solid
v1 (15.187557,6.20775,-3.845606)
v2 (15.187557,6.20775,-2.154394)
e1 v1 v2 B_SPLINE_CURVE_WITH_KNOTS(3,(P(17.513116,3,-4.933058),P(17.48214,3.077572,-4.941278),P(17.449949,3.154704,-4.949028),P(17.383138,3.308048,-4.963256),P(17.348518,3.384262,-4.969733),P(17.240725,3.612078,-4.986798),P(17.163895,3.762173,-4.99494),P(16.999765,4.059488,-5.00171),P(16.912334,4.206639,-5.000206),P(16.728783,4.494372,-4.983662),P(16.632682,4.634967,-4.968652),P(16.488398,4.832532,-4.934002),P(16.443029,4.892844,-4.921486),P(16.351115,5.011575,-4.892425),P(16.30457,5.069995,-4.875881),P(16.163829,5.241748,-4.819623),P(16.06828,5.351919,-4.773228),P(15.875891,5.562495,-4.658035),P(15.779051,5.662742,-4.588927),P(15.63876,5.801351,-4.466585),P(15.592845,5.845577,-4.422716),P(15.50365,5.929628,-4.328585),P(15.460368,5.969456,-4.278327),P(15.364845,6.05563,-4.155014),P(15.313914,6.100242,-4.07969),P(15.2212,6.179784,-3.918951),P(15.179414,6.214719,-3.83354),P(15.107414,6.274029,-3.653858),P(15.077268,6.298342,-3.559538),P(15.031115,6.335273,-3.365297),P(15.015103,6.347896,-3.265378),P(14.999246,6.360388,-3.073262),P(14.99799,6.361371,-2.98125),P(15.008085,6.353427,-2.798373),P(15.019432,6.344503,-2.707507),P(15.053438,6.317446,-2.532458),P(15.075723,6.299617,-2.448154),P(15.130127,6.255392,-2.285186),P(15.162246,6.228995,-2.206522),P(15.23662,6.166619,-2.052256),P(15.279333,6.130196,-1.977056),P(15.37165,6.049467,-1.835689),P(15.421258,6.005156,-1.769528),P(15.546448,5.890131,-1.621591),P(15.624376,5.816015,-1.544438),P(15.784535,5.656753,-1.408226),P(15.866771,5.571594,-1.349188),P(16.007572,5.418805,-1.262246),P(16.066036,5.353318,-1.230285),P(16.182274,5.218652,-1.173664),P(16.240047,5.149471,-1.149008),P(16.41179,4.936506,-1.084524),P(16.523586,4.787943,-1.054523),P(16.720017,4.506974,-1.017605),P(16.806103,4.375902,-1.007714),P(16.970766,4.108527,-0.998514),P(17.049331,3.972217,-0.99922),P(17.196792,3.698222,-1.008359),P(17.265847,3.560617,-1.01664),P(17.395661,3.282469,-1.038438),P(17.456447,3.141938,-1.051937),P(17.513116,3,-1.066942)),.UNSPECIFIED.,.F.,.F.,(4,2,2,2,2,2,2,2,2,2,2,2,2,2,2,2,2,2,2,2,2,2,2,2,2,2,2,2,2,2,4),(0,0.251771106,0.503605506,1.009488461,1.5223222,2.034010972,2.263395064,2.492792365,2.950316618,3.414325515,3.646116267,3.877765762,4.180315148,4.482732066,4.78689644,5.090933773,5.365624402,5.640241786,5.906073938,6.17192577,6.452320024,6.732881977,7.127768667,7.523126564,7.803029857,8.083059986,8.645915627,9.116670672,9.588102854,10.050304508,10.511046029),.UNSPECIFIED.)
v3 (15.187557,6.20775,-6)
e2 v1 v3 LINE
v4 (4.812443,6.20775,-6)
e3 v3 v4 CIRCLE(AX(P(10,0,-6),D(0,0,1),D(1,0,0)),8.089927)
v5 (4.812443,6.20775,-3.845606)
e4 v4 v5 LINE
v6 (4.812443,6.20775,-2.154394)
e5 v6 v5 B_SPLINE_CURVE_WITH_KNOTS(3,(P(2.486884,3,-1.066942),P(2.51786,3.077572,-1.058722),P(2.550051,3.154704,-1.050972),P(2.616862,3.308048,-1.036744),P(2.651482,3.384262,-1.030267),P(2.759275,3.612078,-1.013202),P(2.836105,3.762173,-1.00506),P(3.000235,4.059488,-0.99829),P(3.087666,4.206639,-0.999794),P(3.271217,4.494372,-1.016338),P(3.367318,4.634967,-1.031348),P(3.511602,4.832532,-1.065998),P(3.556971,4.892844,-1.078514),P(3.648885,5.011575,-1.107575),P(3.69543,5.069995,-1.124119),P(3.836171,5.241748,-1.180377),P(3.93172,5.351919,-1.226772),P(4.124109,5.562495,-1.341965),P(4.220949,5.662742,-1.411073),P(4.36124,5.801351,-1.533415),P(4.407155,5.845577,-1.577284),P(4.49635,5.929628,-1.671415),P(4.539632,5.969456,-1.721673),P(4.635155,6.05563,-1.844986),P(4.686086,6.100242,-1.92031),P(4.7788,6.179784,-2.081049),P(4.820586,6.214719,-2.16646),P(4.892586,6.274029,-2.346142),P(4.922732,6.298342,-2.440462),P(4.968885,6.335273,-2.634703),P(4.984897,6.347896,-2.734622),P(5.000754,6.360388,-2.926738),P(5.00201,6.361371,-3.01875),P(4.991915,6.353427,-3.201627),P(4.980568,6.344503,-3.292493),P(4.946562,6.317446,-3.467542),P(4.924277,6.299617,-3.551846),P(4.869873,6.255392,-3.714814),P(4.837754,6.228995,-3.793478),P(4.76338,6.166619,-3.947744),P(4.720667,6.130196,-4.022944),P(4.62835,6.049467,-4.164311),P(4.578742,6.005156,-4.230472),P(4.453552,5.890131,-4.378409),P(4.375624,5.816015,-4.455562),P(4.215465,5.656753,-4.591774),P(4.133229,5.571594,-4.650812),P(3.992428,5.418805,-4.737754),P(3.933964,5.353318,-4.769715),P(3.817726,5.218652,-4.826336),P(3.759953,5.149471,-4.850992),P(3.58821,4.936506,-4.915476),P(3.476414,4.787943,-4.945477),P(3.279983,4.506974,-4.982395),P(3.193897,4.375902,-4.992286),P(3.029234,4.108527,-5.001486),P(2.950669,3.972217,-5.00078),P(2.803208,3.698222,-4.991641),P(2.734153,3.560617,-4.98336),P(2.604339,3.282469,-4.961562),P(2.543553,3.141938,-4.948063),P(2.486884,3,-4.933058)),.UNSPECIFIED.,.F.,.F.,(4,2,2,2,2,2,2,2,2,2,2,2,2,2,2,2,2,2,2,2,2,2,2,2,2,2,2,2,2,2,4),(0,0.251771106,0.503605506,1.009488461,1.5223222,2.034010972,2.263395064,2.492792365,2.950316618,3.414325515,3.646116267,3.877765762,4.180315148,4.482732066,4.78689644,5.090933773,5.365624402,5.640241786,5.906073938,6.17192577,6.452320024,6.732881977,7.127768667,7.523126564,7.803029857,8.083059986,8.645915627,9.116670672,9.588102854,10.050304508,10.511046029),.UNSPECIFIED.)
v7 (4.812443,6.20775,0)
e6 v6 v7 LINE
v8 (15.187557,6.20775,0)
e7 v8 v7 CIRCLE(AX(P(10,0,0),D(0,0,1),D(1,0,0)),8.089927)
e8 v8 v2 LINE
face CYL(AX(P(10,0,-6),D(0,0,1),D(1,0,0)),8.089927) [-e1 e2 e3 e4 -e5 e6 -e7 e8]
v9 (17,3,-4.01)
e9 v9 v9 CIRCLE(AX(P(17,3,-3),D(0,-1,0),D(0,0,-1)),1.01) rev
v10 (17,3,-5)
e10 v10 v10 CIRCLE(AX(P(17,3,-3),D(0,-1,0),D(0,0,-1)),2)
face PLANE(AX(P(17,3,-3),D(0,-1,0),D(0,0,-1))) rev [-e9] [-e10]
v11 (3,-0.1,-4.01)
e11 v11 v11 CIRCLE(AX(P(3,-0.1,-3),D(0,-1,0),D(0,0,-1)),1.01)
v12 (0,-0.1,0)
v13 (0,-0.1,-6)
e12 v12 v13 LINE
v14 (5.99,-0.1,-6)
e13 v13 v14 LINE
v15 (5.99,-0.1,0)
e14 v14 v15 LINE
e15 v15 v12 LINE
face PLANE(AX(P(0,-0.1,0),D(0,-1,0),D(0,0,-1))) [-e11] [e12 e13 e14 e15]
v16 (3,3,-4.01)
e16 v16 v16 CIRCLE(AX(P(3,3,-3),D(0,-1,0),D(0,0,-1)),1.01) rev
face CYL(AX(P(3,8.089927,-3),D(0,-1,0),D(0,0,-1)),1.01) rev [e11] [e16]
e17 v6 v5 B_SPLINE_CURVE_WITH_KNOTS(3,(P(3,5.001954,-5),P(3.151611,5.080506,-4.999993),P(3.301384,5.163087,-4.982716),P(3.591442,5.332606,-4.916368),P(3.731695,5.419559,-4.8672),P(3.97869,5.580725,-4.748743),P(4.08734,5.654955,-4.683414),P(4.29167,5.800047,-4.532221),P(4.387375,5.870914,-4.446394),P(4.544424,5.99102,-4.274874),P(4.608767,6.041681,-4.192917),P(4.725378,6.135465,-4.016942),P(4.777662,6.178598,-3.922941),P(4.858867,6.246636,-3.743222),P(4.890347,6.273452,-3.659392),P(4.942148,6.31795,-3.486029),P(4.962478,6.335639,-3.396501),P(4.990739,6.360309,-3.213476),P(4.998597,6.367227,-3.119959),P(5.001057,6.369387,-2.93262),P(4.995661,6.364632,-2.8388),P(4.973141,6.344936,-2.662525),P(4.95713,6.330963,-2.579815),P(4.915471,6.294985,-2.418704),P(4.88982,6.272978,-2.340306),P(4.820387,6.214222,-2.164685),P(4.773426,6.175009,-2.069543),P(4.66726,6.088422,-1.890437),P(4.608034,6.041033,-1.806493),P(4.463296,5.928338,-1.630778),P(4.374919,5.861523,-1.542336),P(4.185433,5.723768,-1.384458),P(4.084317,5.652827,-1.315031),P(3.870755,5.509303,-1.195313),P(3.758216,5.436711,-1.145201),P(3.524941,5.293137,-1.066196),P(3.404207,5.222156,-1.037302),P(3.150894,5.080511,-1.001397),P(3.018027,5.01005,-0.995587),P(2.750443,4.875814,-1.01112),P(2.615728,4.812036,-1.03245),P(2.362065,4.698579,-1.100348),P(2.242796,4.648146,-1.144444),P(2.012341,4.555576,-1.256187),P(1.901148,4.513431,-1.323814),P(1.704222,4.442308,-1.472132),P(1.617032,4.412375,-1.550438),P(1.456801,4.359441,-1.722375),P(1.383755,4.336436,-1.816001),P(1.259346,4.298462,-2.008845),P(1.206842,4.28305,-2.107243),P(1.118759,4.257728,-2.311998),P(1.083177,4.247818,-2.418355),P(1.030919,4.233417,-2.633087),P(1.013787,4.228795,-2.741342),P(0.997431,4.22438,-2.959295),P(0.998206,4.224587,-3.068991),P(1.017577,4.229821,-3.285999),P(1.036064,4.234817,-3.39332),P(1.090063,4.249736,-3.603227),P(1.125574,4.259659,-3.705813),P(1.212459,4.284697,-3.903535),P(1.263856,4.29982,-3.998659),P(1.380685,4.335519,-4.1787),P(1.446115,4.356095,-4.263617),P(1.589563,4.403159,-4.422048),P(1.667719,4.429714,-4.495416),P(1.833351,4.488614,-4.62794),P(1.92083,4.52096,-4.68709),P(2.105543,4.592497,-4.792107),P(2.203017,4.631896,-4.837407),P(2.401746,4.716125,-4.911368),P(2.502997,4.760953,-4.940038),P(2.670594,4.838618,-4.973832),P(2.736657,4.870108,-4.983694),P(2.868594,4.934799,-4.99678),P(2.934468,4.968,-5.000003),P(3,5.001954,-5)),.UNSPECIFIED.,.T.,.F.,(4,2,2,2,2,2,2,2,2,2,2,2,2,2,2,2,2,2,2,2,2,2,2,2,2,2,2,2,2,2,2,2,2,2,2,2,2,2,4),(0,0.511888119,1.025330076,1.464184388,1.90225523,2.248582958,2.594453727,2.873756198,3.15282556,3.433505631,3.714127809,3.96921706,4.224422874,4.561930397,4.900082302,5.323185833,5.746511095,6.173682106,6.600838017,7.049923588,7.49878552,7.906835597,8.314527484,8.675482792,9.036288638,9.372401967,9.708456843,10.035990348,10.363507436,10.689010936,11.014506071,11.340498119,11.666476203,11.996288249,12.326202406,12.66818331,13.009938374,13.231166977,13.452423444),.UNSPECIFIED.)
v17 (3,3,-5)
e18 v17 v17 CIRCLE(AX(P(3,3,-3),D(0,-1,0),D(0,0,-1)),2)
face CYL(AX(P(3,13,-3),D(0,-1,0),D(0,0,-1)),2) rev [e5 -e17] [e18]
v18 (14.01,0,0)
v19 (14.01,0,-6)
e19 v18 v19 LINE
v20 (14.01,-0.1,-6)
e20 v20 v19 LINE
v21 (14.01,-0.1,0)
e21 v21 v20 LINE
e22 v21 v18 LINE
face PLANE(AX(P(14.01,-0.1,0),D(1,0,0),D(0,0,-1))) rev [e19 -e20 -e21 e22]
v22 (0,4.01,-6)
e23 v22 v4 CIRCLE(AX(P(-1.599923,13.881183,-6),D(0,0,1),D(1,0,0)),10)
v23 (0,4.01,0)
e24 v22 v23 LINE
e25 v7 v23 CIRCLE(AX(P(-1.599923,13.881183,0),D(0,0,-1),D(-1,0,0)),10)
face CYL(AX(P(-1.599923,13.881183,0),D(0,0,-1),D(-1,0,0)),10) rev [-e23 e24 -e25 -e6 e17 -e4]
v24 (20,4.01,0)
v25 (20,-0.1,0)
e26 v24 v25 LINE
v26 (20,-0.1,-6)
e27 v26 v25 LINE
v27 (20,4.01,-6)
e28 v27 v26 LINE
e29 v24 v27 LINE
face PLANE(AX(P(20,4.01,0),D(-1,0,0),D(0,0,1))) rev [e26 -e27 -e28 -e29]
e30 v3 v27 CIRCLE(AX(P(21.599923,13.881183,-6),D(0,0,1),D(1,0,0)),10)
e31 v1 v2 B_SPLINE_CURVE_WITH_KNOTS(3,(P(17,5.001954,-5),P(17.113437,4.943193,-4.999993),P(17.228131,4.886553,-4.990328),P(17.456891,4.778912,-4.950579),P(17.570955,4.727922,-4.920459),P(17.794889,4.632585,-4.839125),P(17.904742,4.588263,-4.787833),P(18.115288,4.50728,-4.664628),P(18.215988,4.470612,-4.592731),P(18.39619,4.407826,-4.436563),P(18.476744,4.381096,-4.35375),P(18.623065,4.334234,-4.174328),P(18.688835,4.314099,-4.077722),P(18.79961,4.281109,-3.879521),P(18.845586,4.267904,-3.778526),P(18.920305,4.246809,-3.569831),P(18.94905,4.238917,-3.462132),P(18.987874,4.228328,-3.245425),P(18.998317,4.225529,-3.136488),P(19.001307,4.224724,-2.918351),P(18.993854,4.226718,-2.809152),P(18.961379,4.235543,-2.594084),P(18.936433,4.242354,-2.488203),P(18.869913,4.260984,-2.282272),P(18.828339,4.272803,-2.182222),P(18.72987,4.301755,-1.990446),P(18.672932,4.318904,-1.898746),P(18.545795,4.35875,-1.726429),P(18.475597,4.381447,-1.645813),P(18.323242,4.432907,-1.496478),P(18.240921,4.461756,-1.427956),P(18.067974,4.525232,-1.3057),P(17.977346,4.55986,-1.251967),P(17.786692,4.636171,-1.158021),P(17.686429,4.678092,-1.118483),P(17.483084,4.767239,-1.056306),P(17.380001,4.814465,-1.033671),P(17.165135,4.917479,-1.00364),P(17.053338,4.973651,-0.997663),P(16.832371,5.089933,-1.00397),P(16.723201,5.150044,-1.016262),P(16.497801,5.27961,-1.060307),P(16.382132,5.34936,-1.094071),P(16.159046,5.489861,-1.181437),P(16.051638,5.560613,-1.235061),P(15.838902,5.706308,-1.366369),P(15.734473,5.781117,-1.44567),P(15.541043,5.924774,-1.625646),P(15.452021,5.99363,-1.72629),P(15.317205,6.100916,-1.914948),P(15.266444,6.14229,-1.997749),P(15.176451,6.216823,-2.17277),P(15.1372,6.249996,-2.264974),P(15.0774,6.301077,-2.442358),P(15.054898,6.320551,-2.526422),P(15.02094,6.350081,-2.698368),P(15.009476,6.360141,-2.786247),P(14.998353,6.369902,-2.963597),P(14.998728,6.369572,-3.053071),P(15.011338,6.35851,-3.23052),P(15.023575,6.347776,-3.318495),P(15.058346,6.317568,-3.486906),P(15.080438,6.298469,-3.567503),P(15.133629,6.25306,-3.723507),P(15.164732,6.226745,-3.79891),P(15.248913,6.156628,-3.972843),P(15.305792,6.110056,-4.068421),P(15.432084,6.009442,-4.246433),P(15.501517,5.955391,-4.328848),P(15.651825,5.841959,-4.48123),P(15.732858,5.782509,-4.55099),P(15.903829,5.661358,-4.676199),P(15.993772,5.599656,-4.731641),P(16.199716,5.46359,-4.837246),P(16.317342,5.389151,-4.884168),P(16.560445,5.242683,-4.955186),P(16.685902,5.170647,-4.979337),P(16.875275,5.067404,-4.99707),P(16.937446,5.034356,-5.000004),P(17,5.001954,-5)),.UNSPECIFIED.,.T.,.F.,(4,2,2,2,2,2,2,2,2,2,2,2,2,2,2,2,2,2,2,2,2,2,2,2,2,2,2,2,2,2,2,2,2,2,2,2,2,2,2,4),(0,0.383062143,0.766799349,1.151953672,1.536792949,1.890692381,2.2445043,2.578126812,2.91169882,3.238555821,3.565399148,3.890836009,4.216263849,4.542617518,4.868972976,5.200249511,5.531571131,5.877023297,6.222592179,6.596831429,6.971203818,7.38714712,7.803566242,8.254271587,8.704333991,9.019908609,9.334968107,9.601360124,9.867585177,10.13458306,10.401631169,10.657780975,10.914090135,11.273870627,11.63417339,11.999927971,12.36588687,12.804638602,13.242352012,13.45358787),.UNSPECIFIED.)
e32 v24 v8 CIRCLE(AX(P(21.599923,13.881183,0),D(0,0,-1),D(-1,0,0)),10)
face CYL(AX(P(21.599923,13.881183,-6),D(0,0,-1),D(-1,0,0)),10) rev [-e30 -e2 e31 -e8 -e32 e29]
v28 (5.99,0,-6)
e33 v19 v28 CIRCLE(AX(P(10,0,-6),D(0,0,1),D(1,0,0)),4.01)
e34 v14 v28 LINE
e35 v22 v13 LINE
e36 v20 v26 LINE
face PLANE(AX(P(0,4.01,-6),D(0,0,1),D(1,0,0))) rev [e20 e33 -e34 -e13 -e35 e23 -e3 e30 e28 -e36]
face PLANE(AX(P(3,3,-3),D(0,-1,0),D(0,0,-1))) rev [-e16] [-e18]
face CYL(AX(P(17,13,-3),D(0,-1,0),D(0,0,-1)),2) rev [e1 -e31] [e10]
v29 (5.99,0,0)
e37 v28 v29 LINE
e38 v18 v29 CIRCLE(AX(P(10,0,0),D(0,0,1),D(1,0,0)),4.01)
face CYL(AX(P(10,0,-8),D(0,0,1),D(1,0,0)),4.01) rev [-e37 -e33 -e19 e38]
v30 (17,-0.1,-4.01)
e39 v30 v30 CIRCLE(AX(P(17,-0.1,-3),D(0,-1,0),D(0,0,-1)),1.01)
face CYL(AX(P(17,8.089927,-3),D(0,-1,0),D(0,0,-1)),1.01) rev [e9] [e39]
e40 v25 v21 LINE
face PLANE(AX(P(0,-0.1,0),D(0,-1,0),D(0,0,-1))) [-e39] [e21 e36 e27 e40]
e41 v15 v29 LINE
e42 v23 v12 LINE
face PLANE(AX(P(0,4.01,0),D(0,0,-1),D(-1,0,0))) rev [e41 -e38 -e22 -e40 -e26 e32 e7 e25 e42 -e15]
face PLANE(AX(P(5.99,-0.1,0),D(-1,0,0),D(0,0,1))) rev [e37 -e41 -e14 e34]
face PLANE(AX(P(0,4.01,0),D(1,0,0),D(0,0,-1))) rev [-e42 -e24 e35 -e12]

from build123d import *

# Parameters (mm, degrees)
SKETCH1_W           = 20
SKETCH1_H           = 6
BOSS_EXTRUDE1_DEPTH = 4.01
BOSS_EXTRUDE2_DEPTH = 6
SKETCH5_W           = 20
SKETCH5_H           = 6
BOSS_EXTRUDE3_DEPTH = 3
SKETCH6_R           = 4.01
CUT_EXTRUDE2_DEPTH  = 8
SKETCH7_W           = 20
SKETCH7_H           = 6
CUT_EXTRUDE3_DEPTH  = 3
FILLET1_R           = 10
SKETCH8_R           = 1.01
CUT_EXTRUDE4_DEPTH  = 23.393010339
CUT_EXTRUDE5_START  = -3
SKETCH9_R           = 2
CUT_EXTRUDE5_DEPTH  = 10
BOSS_EXTRUDE4_START = 0.1
SKETCH10_W          = 5.99
SKETCH10_H          = 6
SKETCH10_R          = 1.01
BOSS_EXTRUDE4_DEPTH = 0.1


with BuildPart() as part:
    # Sketch1 → Boss-Extrude1 (new body)
    with BuildSketch(Plane(origin=(0, 0, 0), x_dir=(1, 0, 0), z_dir=(0, 1, 0))):
        with Locations((10, 3)):
            Rectangle(SKETCH1_W, SKETCH1_H)
    extrude(amount=BOSS_EXTRUDE1_DEPTH)

    # Sketch2 → Boss-Extrude2 (add)
    with BuildSketch(Plane.XY):
        with BuildLine():
            Line((2.973847991, 4.01), (17.026152009, 4.01))
            ThreePointArc((17.026152009, 4.01), (10, 8.089926579), (2.973847991, 4.01))
        make_face()
    extrude(amount=-BOSS_EXTRUDE2_DEPTH)

    # Sketch5 → Boss-Extrude3 (add)
    with BuildSketch(Plane.XZ):
        with Locations((10, -3)):
            Rectangle(SKETCH5_W, SKETCH5_H)
    extrude(amount=BOSS_EXTRUDE3_DEPTH)

    # Sketch6 → Cut-Extrude2 (cut)
    with BuildSketch(Plane.XY):
        with Locations((10, 0)):
            Circle(SKETCH6_R)
    extrude(amount=-CUT_EXTRUDE2_DEPTH, mode=Mode.SUBTRACT)

    # Sketch7 → Cut-Extrude3 (cut)
    with BuildSketch(Plane.XZ.offset(3)):
        with Locations((10, -3)):
            Rectangle(SKETCH7_W, SKETCH7_H)
    extrude(amount=-CUT_EXTRUDE3_DEPTH, mode=Mode.SUBTRACT)

    # Fillet1
    # the kernel refuses this fillet: 10 mm, written as the material it adds along each edge
    with BuildSketch(Plane(origin=(17.026152009, 4.01, 0), x_dir=(1, 0, 0), z_dir=(0, 0, -1))) as fillet1_piece_1:
        with BuildLine():
            CenterArc((4.573770937, -9.871182633), FILLET1_R, 99.206448973, 30.677642317)
            Line((-1.838595026, -2.197750365), (-1.966842345, -2.04428172))
            ThreePointArc((-1.966842345, -2.04428172), (-0.974617613, -1.052595468), (-0.173701255, 0.099135634))
            Line((-0.173701255, 0.099135634), (0, 0.2))
            ThreePointArc((0, 0.2), (1.486923995, 0.2), (2.941849532, 0.197423653))
            Line((2.941849532, 0.197423653), (2.973847991, 0))
        make_face()
    extrude(amount=6)
    with BuildSketch(Plane(origin=(2.973847991, 4.01, 0), x_dir=(0.6416530517809019, 0.7669950202838707, 0), z_dir=(0, 0, -1))) as fillet1_piece_2:
        with BuildLine():
            CenterArc((4.636373844, -9.841933994), FILLET1_R, 100.200714573, 30.677642317)
            Line((-1.908178639, -2.2809266), (-2.039069689, -2.129706452))
            ThreePointArc((-2.039069689, -2.129706452), (-1.107488324, -1.01213269), (-0.153399004, 0.12833061))
            Line((-0.153399004, 0.12833061), (0.035419403, 0.19683868))
            ThreePointArc((0.035419403, 0.19683868), (1.432701848, 0.072125761), (2.829984292, 0.19683868))
            Line((2.829984292, 0.19683868), (2.865403695, 0))
        make_face()
    extrude(amount=6)

    # Sketch8 → Cut-Extrude4 (cut, through all)
    with BuildSketch(Plane.XZ):
        with Locations(Location((3, -3, 0), (0, 0, 270))):
            Circle(SKETCH8_R)
        with Locations(Location((17, -3, 0), (0, 0, 270))):
            Circle(SKETCH8_R)
    extrude(amount=-CUT_EXTRUDE4_DEPTH, mode=Mode.SUBTRACT)

    # Sketch9 → Cut-Extrude5 (cut)
    with BuildSketch(Plane.XZ.offset(CUT_EXTRUDE5_START)):
        with Locations(Location((3, -3, 0), (0, 0, 270))):
            Circle(SKETCH9_R)
        with Locations(Location((17, -3, 0), (0, 0, 270))):
            Circle(SKETCH9_R)
    extrude(amount=-CUT_EXTRUDE5_DEPTH, mode=Mode.SUBTRACT)

    # Sketch10 → Boss-Extrude4 (add)
    # profile 1 of 2: a face of its own
    with BuildSketch(Plane.XZ.offset(BOSS_EXTRUDE4_START)):
        with Locations((2.995, -3)):
            Rectangle(SKETCH10_W, SKETCH10_H)
        with Locations(Location((3, -3, 0), (0, 0, 270))):
            Circle(SKETCH10_R, mode=Mode.SUBTRACT)
    # profile 2 of 2: a face of its own
    with BuildSketch(Plane.XZ.offset(BOSS_EXTRUDE4_START)):
        with Locations((17.005, -3)):
            Rectangle(SKETCH10_W, SKETCH10_H)
        with Locations(Location((17, -3, 0), (0, 0, 270))):
            Circle(SKETCH10_R, mode=Mode.SUBTRACT)
    extrude(amount=-BOSS_EXTRUDE4_DEPTH)


solid = part.part
